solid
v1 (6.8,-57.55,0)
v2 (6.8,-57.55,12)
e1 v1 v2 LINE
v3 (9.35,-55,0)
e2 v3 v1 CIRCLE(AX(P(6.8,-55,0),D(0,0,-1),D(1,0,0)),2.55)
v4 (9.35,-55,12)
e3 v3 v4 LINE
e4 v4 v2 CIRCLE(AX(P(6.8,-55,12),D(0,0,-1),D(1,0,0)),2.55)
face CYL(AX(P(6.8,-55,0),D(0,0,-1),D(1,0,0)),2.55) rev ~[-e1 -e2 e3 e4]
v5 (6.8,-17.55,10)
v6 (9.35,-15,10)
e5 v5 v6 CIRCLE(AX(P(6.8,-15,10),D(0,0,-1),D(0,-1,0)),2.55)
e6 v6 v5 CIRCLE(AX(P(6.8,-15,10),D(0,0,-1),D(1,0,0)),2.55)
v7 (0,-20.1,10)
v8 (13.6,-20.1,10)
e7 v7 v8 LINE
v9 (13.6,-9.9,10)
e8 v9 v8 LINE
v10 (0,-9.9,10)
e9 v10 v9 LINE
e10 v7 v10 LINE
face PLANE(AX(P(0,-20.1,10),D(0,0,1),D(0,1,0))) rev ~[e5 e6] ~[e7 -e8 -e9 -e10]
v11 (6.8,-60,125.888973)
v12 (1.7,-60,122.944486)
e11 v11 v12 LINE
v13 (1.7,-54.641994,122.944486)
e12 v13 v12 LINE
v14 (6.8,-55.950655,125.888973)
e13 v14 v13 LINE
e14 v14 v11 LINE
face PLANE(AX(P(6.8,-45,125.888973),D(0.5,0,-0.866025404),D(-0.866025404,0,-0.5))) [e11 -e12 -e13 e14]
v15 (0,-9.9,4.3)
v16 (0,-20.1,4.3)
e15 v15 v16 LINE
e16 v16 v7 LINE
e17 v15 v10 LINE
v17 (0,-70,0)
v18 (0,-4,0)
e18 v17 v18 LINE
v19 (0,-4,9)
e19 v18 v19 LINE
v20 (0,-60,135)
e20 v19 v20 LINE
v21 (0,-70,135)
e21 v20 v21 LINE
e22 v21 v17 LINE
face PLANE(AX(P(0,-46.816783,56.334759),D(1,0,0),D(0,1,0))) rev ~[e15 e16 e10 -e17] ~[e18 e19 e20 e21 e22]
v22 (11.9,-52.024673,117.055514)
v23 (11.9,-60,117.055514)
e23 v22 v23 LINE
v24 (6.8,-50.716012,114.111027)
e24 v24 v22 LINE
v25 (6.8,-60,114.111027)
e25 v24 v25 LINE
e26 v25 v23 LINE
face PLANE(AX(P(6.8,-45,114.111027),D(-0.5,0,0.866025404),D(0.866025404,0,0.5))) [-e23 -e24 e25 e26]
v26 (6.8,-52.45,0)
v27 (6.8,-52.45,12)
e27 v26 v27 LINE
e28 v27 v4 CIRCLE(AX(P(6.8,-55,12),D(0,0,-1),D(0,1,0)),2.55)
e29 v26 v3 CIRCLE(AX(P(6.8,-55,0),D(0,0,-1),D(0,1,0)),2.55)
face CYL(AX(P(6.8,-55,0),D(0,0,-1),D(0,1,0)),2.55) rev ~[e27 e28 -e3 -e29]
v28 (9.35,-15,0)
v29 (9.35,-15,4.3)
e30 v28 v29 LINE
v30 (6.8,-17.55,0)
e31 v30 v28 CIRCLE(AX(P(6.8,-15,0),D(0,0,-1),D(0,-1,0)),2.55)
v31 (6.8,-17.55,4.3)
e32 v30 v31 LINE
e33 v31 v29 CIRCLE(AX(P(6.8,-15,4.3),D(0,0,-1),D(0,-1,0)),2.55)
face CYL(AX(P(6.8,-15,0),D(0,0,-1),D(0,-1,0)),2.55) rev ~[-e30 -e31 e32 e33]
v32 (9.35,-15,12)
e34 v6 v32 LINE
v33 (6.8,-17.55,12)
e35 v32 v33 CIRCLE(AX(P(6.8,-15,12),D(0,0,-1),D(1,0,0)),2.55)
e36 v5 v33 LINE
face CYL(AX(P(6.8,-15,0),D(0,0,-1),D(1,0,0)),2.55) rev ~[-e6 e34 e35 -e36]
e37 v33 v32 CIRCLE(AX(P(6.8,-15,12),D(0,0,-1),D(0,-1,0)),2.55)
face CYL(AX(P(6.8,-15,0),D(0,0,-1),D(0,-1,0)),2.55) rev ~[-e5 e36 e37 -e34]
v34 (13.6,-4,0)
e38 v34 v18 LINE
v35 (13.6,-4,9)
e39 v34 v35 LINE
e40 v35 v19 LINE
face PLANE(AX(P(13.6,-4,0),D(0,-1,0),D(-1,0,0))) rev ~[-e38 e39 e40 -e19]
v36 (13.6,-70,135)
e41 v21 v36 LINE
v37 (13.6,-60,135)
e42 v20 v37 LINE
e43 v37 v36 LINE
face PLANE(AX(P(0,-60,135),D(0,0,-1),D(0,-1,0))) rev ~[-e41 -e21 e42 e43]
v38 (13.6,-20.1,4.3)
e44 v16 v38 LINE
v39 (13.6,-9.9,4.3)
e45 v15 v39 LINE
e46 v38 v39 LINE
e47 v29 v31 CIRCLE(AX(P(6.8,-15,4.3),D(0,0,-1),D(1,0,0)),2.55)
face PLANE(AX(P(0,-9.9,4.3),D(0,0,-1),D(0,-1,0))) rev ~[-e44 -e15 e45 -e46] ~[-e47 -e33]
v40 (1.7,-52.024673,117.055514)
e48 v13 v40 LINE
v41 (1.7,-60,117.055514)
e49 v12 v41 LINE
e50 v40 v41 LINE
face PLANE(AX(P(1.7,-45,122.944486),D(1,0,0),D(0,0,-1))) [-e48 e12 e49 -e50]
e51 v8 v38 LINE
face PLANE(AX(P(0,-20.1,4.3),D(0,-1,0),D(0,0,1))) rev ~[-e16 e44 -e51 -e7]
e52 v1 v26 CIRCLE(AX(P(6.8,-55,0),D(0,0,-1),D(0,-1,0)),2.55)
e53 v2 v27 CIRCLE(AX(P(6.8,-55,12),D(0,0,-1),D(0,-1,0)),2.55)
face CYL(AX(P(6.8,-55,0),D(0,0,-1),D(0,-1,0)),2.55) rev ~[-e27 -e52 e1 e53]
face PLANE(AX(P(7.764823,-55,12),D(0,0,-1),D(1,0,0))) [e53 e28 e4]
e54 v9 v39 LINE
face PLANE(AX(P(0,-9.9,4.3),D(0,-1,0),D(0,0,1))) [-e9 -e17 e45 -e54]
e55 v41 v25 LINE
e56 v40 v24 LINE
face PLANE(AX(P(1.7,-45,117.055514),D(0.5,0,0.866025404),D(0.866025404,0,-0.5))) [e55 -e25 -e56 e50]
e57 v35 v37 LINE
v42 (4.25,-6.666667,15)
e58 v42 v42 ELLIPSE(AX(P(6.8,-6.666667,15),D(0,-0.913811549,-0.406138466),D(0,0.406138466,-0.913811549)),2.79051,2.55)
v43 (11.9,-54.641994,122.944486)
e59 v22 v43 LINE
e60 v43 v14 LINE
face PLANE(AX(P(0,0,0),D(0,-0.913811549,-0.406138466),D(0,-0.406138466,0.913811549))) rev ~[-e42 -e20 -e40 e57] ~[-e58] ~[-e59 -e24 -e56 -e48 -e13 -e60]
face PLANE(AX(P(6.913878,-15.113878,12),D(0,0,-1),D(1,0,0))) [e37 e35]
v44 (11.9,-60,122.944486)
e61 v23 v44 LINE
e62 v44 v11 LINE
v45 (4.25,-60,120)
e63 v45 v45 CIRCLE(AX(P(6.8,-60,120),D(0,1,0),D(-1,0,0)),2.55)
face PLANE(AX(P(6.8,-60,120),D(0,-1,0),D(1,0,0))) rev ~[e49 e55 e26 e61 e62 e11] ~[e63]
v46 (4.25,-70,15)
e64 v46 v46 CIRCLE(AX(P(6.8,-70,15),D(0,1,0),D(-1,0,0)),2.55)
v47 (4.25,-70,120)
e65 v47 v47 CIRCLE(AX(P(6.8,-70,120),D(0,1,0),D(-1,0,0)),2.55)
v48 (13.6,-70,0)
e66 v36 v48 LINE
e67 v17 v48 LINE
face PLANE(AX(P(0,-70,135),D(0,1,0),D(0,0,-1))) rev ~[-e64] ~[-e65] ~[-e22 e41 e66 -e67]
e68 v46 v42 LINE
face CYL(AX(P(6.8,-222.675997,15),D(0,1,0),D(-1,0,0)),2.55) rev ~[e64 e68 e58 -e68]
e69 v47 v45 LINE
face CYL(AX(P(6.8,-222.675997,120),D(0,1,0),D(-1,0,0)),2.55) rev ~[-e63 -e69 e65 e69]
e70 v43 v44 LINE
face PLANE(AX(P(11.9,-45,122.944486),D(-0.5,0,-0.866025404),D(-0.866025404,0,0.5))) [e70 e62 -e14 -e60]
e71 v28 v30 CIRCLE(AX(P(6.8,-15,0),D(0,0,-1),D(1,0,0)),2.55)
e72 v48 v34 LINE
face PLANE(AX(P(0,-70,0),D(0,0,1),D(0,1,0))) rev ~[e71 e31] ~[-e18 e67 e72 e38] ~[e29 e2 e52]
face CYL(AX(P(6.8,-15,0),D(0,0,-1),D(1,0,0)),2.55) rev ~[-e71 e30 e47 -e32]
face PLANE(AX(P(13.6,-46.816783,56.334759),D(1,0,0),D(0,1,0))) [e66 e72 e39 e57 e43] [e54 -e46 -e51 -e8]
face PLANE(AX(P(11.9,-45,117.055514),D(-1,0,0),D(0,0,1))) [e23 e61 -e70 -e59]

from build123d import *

# Parameters (mm, degrees)
F1_DEPTH  = 13.6
F3_D      = 5.1
F5_DEPTH  = 12
F6_DEPTH  = 25
F7_DEPTH  = 15
F8_D      = 5.1
F9_W      = 5.1
F9_H      = 5.7
F10_DEPTH = 25
F4_W      = 6.8
F4_H      = 4
F11_DEPTH = 25


# Not quite as in the source:
# - a feature names something its author has since deleted; it is built from what else it names


with BuildPart() as f1:
    # F0 (on Right) → F1 (new body)
    with BuildSketch(Plane.YZ):
        Polygon((-70, 0), (0, 0), (-60, 135), (-70, 135), align=None)
    extrude(amount=F1_DEPTH)

    # F3 (through all)
    with Locations(Plane.XZ.offset(70)):
        with Locations((6.8, 15), (6.8, 120)):
            Hole(F3_D / 2)

    # F4 (on face) → F5 (cut)
    with BuildSketch(Plane(origin=(0, 0, 0), x_dir=(1, 0, 0), z_dir=(0, 0, -1))):
        with BuildLine():
            ThreePointArc((9.35, 55), (8.603122292, 56.803122292), (6.8, 57.55))
            Line((6.8, 57.55), (6.8, 55))
            Line((6.8, 55), (6.8, 52.45))
            ThreePointArc((6.8, 52.45), (8.603122292, 53.196877708), (9.35, 55))
        make_face()
        with BuildLine():
            ThreePointArc((9.35, 15), (8.603122292, 16.803122292), (6.8, 17.55))
            ThreePointArc((6.8, 17.55), (4.996877708, 13.196877708), (9.35, 15))
        make_face()
        with BuildLine():
            Line((6.8, 55), (6.8, 57.55))
            ThreePointArc((6.8, 57.55), (4.25, 55), (6.8, 52.45))
            Line((6.8, 52.45), (6.8, 55))
        make_face()
    extrude(amount=-F5_DEPTH, mode=Mode.SUBTRACT)

    # F2 (on face) → F6 (join)
    with BuildSketch(Plane.XZ.offset(70)):
        Polygon((11.9, 122.9444863729), (6.8, 125.8889727457), (1.7, 122.9444863729), (1.7, 117.0555136271), (6.8, 114.1110272543), (11.9, 117.0555136271), align=None)
    extrude(amount=-F6_DEPTH)

    # F7 (cut): a face of the model
    f7_faces = [f1.faces().sort_by_distance(p)[0] for p in [
        (6.8, -45, 120),
    ]]
    extrude(f7_faces, amount=-F7_DEPTH, mode=Mode.SUBTRACT)

    # F8 (through all)
    with Locations(Plane.XZ.offset(70)):
        with Locations((6.8, 120)):
            Hole(F8_D / 2)

    # F9 (on face) → F10 (cut)
    with BuildSketch(Plane(origin=(0, 0, 0), x_dir=(0, -1, 0), z_dir=(-1, 0, 0))):
        with Locations((12.45, 7.15)):
            Rectangle(F9_W, F9_H)
        with Locations((17.55, 7.15)):
            Rectangle(F9_W, F9_H)
    extrude(amount=-F10_DEPTH, mode=Mode.SUBTRACT)

    # F4 (on face) → F11 (cut)
    with BuildSketch(Plane(origin=(0, 0, 0), x_dir=(1, 0, 0), z_dir=(0, 0, -1))):
        with Locations((10.2, 2)):
            Rectangle(F4_W, F4_H)
        with Locations((3.4, 2)):
            Rectangle(F4_W, F4_H)
    extrude(amount=-F11_DEPTH, mode=Mode.SUBTRACT)


solid = f1.part
